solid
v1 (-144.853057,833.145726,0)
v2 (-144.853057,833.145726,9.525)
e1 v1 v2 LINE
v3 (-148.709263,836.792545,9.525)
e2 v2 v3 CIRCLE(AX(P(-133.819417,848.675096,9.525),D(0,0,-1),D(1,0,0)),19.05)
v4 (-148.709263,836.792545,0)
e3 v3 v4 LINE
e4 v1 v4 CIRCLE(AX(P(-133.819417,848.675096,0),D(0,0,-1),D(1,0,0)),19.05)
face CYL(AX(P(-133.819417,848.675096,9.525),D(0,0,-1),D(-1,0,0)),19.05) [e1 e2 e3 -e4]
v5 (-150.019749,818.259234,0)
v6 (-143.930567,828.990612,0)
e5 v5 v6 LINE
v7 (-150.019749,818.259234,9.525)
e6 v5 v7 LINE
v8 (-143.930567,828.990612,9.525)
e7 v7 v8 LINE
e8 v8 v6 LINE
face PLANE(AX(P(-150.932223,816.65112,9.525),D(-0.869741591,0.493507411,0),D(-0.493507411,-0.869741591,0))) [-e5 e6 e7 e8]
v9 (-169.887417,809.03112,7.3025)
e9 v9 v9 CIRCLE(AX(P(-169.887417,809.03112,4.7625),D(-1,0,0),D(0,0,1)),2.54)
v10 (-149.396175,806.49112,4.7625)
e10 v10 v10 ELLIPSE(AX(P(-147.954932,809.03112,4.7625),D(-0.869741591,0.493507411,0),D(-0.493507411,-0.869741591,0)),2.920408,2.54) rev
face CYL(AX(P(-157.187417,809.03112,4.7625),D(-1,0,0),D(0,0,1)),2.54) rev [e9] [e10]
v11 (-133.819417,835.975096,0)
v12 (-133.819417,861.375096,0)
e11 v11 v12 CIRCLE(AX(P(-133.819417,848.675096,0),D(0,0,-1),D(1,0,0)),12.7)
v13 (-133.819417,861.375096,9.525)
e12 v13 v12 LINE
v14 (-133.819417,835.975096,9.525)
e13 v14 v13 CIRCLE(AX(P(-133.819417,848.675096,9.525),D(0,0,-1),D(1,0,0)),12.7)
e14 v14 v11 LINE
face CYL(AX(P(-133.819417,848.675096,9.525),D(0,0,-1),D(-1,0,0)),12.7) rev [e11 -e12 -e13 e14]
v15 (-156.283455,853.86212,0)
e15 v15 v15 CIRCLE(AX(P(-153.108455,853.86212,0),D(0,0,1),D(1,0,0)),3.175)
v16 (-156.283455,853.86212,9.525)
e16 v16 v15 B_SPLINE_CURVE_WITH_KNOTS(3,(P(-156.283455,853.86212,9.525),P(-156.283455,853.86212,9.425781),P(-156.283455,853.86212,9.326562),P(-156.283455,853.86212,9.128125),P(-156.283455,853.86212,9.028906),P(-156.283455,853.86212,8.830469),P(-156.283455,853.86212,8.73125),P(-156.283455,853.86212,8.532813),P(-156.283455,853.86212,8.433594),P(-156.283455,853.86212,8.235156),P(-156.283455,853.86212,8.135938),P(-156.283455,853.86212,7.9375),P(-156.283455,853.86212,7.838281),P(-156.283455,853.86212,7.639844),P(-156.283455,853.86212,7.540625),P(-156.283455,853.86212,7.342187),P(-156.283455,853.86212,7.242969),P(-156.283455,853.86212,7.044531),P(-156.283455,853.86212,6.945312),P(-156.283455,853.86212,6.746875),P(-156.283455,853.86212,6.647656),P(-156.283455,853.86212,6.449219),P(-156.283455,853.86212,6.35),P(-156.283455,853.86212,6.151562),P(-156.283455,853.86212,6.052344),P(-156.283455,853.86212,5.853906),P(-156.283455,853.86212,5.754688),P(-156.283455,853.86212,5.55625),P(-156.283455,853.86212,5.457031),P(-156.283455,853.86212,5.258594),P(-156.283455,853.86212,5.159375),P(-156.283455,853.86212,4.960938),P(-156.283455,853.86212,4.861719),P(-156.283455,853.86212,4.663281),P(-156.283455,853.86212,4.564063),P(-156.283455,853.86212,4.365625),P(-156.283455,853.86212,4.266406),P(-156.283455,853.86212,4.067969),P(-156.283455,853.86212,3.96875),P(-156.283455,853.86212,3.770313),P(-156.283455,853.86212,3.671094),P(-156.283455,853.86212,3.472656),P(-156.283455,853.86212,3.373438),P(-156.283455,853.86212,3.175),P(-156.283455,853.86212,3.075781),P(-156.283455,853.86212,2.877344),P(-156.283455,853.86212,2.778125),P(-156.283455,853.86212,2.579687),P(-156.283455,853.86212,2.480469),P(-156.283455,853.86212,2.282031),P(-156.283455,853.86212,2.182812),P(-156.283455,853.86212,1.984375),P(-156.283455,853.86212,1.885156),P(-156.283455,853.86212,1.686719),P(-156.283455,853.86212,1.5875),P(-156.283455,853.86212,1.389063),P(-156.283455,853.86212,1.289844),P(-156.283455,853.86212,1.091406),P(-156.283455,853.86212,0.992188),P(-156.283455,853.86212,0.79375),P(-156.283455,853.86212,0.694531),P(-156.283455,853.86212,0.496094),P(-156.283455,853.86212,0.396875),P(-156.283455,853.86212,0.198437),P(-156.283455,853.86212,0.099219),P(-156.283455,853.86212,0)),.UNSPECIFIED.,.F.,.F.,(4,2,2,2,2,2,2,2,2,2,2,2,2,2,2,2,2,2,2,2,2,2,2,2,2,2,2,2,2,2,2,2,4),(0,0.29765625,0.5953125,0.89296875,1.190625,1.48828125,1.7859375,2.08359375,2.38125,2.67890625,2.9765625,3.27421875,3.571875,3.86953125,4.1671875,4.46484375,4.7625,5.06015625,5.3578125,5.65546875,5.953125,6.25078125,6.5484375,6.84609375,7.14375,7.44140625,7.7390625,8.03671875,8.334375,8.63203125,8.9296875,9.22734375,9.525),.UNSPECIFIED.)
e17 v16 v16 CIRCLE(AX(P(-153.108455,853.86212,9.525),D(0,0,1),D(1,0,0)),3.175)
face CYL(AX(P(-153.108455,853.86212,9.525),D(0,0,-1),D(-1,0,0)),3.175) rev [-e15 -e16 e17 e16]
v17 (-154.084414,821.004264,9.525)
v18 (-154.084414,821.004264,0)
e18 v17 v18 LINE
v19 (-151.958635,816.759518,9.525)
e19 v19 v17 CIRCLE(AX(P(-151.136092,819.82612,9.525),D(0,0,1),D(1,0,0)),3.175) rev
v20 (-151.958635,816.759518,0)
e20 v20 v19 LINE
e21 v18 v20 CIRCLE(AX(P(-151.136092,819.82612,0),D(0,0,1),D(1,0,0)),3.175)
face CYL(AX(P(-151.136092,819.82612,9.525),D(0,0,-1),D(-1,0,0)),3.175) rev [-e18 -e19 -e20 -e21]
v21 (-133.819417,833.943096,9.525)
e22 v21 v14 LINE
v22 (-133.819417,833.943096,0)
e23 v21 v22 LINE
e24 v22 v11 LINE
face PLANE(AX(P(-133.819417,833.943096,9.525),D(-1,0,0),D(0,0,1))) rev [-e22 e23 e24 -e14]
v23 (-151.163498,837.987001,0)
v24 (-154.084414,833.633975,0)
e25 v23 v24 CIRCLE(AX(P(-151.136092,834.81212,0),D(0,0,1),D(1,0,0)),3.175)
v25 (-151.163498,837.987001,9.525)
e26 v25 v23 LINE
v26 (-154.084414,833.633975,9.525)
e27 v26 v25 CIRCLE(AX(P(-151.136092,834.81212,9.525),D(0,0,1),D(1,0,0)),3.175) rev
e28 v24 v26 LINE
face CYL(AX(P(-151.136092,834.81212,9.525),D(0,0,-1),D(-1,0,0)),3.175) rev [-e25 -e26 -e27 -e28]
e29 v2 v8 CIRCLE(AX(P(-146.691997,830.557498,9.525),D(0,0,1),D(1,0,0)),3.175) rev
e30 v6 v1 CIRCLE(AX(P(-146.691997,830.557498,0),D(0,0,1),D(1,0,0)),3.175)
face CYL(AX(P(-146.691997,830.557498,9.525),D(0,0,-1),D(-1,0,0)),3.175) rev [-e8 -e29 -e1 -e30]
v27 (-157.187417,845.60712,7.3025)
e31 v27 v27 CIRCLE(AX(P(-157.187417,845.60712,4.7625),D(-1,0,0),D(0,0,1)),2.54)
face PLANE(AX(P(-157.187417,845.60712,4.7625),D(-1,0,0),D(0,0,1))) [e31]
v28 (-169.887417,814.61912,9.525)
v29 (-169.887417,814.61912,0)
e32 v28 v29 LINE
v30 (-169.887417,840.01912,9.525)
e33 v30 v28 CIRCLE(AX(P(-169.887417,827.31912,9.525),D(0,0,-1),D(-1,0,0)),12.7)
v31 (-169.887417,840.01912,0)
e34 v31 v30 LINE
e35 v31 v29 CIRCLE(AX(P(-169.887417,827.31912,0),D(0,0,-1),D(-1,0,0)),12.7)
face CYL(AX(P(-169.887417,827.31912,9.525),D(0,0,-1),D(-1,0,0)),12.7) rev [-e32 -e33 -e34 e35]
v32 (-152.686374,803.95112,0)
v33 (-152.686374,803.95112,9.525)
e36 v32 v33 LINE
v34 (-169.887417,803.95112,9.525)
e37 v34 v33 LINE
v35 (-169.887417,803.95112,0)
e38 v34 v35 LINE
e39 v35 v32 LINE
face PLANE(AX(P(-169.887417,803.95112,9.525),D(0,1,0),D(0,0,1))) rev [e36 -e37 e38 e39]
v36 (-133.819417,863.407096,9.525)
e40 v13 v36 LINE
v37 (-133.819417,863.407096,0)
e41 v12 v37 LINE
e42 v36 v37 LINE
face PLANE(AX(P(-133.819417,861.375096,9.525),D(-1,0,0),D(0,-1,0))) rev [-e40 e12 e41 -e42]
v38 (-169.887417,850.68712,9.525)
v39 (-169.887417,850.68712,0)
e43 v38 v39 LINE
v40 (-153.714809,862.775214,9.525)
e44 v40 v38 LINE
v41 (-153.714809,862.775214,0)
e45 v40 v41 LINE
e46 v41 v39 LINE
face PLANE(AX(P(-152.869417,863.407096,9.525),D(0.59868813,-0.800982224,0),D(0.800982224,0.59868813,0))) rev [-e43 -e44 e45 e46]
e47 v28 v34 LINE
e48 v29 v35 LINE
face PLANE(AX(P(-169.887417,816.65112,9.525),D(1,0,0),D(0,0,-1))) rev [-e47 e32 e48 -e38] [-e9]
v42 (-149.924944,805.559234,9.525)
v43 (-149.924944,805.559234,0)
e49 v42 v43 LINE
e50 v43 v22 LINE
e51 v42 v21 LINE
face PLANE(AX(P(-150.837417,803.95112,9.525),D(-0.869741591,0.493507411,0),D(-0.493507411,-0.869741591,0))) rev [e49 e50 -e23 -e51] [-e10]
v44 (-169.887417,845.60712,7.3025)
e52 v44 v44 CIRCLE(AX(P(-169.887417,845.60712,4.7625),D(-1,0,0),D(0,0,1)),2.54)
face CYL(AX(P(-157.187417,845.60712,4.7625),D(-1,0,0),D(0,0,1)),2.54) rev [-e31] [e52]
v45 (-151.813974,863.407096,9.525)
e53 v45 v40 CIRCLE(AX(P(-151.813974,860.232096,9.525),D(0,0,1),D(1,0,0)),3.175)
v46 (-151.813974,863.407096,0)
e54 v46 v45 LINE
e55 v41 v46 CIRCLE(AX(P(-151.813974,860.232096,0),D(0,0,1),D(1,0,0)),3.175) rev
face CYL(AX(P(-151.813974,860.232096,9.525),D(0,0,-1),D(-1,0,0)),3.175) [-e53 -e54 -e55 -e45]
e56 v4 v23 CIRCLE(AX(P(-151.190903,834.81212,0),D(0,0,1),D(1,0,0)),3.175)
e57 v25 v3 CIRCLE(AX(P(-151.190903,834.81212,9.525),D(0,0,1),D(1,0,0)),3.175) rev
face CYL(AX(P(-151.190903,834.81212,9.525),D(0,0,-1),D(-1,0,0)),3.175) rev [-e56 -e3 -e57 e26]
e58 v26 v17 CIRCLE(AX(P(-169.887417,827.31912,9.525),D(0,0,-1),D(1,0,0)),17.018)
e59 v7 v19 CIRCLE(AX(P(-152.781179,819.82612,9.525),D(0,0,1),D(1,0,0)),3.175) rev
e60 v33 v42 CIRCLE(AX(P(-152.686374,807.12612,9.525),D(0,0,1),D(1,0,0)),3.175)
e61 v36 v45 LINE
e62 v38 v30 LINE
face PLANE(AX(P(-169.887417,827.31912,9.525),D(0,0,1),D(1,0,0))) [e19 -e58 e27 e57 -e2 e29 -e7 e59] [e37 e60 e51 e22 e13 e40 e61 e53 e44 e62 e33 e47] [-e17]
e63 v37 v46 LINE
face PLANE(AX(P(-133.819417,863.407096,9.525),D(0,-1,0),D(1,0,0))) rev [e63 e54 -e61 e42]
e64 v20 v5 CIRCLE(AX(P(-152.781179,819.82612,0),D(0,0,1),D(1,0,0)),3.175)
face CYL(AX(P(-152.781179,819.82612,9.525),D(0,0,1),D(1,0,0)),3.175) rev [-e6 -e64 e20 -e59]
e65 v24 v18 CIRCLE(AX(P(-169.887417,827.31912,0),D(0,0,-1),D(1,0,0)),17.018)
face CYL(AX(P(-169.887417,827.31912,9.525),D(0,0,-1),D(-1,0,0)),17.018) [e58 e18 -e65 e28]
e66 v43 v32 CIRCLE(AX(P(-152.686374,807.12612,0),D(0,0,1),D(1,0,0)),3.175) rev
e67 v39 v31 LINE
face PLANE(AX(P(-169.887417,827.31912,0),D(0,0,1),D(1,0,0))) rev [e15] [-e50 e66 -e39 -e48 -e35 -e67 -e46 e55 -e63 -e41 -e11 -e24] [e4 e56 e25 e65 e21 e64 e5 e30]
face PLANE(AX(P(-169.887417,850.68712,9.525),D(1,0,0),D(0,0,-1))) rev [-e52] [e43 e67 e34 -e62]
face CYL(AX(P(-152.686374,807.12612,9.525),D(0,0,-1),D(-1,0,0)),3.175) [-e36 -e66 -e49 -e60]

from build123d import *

# Parameters (mm, degrees)
SKETCH1_R           = 3.175
BOSS_EXTRUDE1_DEPTH = 9.525
SKETCH3_R           = 2.54
CUT_EXTRUDE1_DEPTH  = 12.7
CUT_EXTRUDE2_REACH  = 865.776
SKETCH4_R           = 2.54
FILLET1_R           = 3.175
SKETCH5_R           = 12.7
CUT_EXTRUDE3_DEPTH  = 881.013791313


with BuildPart() as part:
    # Sketch1 → Boss-Extrude1 (new body)
    with BuildSketch(Plane.XY):
        with BuildLine():
            Line((-169.8874175, 850.687119625), (-169.8874175, 837.987119625))
            ThreePointArc((-169.8874175, 837.987119625), (-159.2194175, 827.319119625), (-169.8874175, 816.651119625))
            Line((-169.8874175, 816.651119625), (-169.8874175, 803.951119625))
            Line((-169.8874175, 803.951119625), (-150.8374175, 803.951119625))
            Line((-150.8374175, 803.951119625), (-133.8194175, 833.943095553))
            Line((-133.8194175, 833.943095553), (-133.8194175, 835.975095553))
            ThreePointArc((-133.8194175, 835.975095553), (-146.5194175, 848.675095553), (-133.8194175, 861.375095553))
            Line((-133.8194175, 861.375095553), (-133.8194175, 863.407095553))
            Line((-133.8194175, 863.407095553), (-152.8694175, 863.407095553))
            Line((-152.8694175, 863.407095553), (-169.8874175, 850.687119625))
        make_face()
        with Locations(Location((-153.108454604, 853.862119625, 0), (0, 0, 180))):
            Circle(SKETCH1_R, mode=Mode.SUBTRACT)
        with BuildLine():
            Line((-150.93222253, 816.651119625), (-142.409287823, 831.671665669))
            ThreePointArc((-142.409287823, 831.671665669), (-146.401670459, 834.371620085), (-149.588680975, 837.987119625))
            Line((-149.588680975, 837.987119625), (-156.628228233, 837.987119625))
            ThreePointArc((-156.628228233, 837.987119625), (-152.8694175, 827.319119625), (-156.628228233, 816.651119625))
            Line((-156.628228233, 816.651119625), (-150.93222253, 816.651119625))
        make_face(mode=Mode.SUBTRACT)
    extrude(amount=BOSS_EXTRUDE1_DEPTH)

    # Sketch3 → Cut-Extrude1 (cut)
    with BuildSketch(Plane.ZY.offset(169.8874175)):
        with Locations((4.7625, 845.607119625)):
            Circle(SKETCH3_R)
        with Locations((4.7625, 809.031119625)):
            Circle(SKETCH3_R)
    extrude(amount=-CUT_EXTRUDE1_DEPTH, mode=Mode.SUBTRACT)

    # Sketch4 → Cut-Extrude2 (cut, up to next)
    with BuildSketch(Plane.ZY.offset(157.1874175), mode=Mode.PRIVATE) as cut_extrude2_sk1:
        with Locations((4.7625, 809.031119625)):
            Circle(SKETCH4_R)
    cut_extrude2_tool1 = extrude(cut_extrude2_sk1.sketch, amount=-CUT_EXTRUDE2_REACH, mode=Mode.PRIVATE) & part.part
    add(cut_extrude2_tool1.solids().sort_by_distance((-157.187417, 809.03112, 4.7625))[0], mode=Mode.SUBTRACT)

    # Fillet1
    # the kernel refuses this fillet: 3.175 mm, written as the material it adds along each edge
    with BuildSketch(Plane(origin=(-150.93222253, 816.651119625, 0), x_dir=(0.4935074111606293, 0.8697415910082337, 0), z_dir=(0, 0, 1))) as fillet1_piece_1:
        with BuildLine():
            CenterArc((FILLET1_R * 0.582348359646, FILLET1_R), FILLET1_R, 209.571375415, 60.428624585)
            Line((-FILLET1_R * 0.287393231362, FILLET1_R * 0.506492588839), (0, 0))
            Line((0, 0), (FILLET1_R * 0.582348359646, 0))
        make_face()
    extrude(amount=9.525)
    with BuildSketch(Plane(origin=(-149.588680975, 837.987119625, 0), x_dir=(0.5928517761937993, -0.8053115989875331, 0), z_dir=(0, 0, 1))) as fillet1_piece_2:
        with BuildLine():
            CenterArc((1.606983899, -3.172592716), FILLET1_R, 92.231294299, 51.409064566)
            Line((-0.949880428, -1.290288327), (0, 0))
            ThreePointArc((0, 0), (0.741684876, -0.014443703), (1.483369753, 0))
        make_face()
    extrude(amount=9.525)
    with BuildSketch(Plane(origin=(-156.628228233, 837.987119625, 0), x_dir=(1, 0, 0), z_dir=(0, 0, 1))) as fillet1_piece_3:
        with BuildLine():
            CenterArc((5.49213602, -3.175), FILLET1_R, 90, 111.781571646)
            ThreePointArc((2.543814434, -4.353144654), (1.434014336, -2.081843008), (0, 0))
            Line((0, 0), (5.49213602, 0))
        make_face()
    extrude(amount=9.525)
    with BuildSketch(Plane(origin=(-156.628228233, 816.651119625, 0), x_dir=(0.5045338460547648, 0.8633919145933595, 0), z_dir=(0, 0, 1))) as fillet1_piece_4:
        with BuildLine():
            CenterArc((5.512237838, -3.139970872), FILLET1_R, 98.518841269, 111.781571646)
            Line((2.770968509, -4.741865834), (0, 0))
            ThreePointArc((0, 0), (2.520955189, -0.187756124), (5.041910378, 0))
        make_face()
    extrude(amount=9.525)
    with BuildSketch(Plane(origin=(-142.409287823, 831.671665669, 0), x_dir=(-0.49350741116063396, -0.869741591008231, 0), z_dir=(0, 0, 1))) as fillet1_piece_5:
        with BuildLine():
            CenterArc((3.082586278, -3.175), FILLET1_R, 90, 84.177526613)
            ThreePointArc((-0.07603388, -2.852907312), (0.015483213, -1.427879508), (0, 0))
            Line((0, 0), (3.082586278, 0))
        make_face()
    extrude(amount=9.525)
    # the kernel refuses this fillet: 3.175 mm, written as the material it takes off along each edge
    with BuildSketch(Plane(origin=(-152.8694175, 863.407095553, -2.638608517), x_dir=(-0.80098222360548, -0.5986881303884525, 0), z_dir=(0, 0, 1))) as fillet1_2_piece_1:
        with BuildLine():
            CenterArc((FILLET1_R * 0.332423120307, FILLET1_R), FILLET1_R, 233.22400043, 36.77599957)
            Line((-FILLET1_R * 0.266265010081, FILLET1_R * 0.199017776395), (0, 0))
            Line((0, 0), (FILLET1_R * 0.332423120307, 0))
        make_face()
    extrude(amount=14.802217035, mode=Mode.SUBTRACT)
    with BuildSketch(Plane(origin=(-150.8374175, 803.951119625, -4.622390105), x_dir=(-1, 0, 0), z_dir=(0, 0, 1))) as fillet1_2_piece_2:
        with BuildLine():
            CenterArc((FILLET1_R * 0.582348359646, -FILLET1_R), FILLET1_R, 90, 60.428624585)
            Line((-FILLET1_R * 0.287393231362, -FILLET1_R * 0.506492588839), (0, 0))
            Line((0, 0), (FILLET1_R * 0.582348359646, 0))
        make_face()
    extrude(amount=18.769780209, mode=Mode.SUBTRACT)

    # Sketch5 → Cut-Extrude3 (cut, through all)
    with BuildSketch(Plane(origin=(0, 0, 0), x_dir=(-1, 0, 0), z_dir=(0, 0, -1))):
        with Locations((169.8874175, 827.319119625)):
            Circle(SKETCH5_R)
    extrude(amount=-CUT_EXTRUDE3_DEPTH, mode=Mode.SUBTRACT)


solid = part.part
